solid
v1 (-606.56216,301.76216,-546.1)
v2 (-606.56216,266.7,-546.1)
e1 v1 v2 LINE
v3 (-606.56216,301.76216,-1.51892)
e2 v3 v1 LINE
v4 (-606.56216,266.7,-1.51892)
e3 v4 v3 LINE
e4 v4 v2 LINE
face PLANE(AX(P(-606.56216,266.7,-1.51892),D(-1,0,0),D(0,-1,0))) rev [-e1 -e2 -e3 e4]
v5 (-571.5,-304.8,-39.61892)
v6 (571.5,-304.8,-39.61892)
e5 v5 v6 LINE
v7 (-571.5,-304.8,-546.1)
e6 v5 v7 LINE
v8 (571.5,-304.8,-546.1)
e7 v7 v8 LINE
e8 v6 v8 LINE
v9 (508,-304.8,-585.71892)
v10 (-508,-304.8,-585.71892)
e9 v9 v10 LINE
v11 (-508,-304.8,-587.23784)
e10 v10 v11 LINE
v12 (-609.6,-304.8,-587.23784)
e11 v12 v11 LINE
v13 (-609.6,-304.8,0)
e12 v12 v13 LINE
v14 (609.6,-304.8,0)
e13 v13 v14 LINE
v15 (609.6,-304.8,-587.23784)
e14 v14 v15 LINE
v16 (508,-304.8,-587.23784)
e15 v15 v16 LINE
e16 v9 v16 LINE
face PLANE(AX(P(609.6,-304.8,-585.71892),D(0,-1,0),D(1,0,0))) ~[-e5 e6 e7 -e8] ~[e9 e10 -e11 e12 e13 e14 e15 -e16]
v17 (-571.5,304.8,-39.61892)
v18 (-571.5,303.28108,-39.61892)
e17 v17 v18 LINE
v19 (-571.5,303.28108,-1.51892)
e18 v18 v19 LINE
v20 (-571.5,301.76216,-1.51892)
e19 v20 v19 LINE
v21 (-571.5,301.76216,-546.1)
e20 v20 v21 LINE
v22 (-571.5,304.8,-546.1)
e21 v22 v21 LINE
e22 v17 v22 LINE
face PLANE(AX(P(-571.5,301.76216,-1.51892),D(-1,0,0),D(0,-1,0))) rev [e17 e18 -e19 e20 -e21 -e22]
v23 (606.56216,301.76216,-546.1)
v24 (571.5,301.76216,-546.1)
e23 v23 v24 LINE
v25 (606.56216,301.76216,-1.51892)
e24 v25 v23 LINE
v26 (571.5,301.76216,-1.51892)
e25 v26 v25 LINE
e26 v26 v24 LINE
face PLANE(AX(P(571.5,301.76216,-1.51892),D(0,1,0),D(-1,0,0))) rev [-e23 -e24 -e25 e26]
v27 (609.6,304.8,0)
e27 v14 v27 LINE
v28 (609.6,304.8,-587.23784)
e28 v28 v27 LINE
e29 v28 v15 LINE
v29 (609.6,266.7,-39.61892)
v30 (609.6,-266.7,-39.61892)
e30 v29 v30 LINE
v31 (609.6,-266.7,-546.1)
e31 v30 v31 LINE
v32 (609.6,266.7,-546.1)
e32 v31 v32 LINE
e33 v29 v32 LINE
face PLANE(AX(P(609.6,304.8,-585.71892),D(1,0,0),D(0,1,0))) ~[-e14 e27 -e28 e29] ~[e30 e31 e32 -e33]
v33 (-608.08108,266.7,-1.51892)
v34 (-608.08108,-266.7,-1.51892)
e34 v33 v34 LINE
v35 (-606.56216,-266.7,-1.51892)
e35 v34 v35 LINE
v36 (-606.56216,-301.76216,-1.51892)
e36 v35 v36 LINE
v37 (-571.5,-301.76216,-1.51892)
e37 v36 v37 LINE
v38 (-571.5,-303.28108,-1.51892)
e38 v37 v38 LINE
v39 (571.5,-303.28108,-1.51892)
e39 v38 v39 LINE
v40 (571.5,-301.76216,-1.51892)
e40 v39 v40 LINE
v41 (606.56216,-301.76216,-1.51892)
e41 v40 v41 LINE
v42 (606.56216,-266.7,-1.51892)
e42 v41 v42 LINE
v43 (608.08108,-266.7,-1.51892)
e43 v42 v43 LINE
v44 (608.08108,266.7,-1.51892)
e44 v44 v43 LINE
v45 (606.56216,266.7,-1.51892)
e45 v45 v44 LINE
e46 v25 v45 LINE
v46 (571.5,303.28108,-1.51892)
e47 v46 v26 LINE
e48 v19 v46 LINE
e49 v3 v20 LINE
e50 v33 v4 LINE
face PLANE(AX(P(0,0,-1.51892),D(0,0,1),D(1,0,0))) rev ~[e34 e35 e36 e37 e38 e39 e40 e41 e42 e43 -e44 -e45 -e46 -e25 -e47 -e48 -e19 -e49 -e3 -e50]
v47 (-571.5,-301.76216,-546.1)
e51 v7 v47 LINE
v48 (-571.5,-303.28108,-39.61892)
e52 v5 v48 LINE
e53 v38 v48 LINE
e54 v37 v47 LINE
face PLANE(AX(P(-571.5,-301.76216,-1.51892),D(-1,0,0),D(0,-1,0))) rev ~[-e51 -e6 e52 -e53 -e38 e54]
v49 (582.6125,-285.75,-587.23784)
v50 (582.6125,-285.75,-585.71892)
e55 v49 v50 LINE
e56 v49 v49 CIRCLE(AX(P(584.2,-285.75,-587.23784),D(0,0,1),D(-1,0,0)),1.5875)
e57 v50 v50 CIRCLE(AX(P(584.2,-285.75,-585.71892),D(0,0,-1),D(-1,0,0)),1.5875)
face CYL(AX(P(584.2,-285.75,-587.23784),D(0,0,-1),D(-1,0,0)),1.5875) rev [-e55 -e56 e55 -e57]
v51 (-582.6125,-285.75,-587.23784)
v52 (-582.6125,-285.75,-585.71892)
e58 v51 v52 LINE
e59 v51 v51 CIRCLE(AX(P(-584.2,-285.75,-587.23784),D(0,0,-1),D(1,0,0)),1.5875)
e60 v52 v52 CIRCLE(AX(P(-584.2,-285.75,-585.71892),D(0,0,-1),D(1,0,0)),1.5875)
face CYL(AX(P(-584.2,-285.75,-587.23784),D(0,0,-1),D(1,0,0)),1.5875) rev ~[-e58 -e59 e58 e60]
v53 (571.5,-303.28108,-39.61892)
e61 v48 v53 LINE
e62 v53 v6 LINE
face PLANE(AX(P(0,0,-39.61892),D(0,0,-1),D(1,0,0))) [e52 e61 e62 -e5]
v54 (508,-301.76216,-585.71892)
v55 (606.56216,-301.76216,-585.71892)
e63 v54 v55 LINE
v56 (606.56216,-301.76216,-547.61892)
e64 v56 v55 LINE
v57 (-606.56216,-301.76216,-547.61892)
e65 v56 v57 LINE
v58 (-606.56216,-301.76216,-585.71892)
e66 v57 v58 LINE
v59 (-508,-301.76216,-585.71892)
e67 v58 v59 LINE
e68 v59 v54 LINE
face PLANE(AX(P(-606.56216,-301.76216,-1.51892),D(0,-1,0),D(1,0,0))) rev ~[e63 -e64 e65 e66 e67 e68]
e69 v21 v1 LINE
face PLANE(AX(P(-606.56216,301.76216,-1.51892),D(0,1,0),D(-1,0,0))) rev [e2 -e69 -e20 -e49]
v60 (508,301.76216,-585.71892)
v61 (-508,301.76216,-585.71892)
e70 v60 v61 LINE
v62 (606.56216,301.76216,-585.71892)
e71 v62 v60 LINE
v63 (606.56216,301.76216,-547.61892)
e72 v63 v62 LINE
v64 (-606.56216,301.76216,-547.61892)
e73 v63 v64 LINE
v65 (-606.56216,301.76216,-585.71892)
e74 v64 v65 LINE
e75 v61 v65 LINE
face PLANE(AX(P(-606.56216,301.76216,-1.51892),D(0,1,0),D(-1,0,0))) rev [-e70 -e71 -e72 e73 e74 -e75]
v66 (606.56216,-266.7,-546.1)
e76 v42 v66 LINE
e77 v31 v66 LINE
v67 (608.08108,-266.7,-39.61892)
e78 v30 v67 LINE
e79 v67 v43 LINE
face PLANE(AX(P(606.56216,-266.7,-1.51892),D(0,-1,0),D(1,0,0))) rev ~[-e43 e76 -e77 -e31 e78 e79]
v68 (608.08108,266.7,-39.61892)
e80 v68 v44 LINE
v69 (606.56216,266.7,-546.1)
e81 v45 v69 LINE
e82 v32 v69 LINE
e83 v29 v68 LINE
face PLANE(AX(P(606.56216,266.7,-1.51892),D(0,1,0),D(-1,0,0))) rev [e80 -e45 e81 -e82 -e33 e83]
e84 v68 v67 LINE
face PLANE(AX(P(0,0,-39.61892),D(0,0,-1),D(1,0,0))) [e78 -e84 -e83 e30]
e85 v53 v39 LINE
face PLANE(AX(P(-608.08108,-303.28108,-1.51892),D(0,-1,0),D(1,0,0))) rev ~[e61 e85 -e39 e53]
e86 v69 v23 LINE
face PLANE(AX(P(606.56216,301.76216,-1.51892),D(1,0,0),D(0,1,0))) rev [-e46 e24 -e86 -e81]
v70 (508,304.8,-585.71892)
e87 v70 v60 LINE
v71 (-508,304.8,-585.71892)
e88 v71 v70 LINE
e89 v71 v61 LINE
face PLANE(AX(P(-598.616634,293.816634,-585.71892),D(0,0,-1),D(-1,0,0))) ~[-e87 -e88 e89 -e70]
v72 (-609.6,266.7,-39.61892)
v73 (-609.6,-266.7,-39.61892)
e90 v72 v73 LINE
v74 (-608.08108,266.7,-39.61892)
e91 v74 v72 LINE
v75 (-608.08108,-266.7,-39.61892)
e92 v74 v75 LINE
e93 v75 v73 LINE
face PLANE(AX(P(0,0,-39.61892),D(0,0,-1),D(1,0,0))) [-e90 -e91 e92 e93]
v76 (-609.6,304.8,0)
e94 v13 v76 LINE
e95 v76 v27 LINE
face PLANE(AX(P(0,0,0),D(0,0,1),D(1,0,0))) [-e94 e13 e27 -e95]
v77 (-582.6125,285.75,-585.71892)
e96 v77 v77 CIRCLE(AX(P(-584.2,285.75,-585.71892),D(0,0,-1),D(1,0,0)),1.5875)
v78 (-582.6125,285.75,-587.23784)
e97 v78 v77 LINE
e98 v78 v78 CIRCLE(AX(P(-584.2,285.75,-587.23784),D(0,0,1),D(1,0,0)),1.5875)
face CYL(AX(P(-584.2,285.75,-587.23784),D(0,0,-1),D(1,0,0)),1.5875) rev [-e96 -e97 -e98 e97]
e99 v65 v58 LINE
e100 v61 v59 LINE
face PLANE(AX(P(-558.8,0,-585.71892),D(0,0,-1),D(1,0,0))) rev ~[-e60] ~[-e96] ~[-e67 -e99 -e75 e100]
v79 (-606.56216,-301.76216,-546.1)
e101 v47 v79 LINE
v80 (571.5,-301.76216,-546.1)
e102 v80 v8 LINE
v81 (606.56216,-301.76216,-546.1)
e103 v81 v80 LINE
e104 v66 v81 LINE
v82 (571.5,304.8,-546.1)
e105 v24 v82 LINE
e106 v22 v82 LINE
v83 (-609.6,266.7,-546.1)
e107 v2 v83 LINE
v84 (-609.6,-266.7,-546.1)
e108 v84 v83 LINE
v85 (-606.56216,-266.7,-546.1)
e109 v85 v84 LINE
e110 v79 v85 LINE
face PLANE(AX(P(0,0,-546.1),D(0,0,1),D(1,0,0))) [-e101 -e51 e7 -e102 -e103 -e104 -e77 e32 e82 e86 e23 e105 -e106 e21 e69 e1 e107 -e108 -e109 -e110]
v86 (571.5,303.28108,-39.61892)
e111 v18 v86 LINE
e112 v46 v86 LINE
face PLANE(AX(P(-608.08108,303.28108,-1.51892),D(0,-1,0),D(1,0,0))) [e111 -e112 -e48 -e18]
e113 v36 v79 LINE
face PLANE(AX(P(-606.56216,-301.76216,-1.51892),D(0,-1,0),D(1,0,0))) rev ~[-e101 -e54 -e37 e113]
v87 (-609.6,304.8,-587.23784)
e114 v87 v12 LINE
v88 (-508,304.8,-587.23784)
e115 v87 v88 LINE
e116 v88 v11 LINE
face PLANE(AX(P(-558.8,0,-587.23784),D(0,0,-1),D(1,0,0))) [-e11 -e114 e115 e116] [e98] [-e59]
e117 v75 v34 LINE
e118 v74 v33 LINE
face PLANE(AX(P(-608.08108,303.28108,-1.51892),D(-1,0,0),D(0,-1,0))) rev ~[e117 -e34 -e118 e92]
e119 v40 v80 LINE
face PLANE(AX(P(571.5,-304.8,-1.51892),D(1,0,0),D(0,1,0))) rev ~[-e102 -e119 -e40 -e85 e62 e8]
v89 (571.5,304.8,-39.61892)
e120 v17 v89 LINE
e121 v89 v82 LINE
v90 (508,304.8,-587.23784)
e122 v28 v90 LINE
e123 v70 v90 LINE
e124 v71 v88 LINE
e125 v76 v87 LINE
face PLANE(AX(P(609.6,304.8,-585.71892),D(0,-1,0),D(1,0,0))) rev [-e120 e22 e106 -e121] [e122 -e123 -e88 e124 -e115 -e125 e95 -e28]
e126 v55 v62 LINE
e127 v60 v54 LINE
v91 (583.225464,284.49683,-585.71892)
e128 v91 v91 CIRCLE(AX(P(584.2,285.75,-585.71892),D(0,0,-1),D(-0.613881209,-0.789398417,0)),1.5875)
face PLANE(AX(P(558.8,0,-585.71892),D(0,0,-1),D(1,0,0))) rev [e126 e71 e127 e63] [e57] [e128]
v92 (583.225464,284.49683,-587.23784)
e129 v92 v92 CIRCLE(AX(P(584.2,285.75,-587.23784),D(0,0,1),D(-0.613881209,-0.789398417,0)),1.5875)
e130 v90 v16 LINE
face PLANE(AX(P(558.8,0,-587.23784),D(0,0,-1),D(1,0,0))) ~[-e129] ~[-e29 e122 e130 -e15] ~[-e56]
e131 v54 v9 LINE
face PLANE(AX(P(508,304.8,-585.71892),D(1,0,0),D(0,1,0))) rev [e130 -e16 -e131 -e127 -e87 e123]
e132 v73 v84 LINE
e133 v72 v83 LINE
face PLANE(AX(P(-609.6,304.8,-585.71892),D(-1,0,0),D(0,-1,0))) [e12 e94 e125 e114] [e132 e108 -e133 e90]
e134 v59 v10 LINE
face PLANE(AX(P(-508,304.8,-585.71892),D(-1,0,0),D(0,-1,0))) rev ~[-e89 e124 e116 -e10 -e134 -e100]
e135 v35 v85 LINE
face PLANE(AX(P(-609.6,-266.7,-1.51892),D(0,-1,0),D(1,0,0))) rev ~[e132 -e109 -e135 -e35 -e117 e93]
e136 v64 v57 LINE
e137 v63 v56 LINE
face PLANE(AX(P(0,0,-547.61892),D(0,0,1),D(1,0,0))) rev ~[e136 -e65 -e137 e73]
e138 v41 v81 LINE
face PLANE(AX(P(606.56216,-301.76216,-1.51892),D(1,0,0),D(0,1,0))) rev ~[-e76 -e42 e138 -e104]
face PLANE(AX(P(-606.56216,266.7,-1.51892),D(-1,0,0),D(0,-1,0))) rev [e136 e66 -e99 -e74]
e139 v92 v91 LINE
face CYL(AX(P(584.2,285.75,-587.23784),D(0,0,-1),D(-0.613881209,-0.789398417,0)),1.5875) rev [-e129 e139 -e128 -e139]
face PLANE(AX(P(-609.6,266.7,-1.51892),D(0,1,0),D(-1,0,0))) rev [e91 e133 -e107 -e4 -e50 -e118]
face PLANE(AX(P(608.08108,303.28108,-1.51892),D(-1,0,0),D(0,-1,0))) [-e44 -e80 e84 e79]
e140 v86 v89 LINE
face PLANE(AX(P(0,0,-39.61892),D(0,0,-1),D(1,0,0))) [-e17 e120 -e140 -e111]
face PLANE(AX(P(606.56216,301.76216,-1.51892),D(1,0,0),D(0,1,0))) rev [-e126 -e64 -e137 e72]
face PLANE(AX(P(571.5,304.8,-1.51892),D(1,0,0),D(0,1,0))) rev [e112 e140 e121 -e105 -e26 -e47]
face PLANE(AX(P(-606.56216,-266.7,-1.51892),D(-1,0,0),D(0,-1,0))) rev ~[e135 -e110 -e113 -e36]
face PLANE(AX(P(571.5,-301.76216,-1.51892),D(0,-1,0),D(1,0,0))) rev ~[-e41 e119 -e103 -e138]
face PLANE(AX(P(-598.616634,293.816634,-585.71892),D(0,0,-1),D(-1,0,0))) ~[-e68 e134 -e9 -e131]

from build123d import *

# Parameters (mm, degrees)
F0_W      = 1219.2
F0_H      = 609.6
F1_DEPTH  = 1.51892
F2_W      = 1219.2
F2_H      = 609.6
F2_W_2    = 1216.16216
F2_H_2    = 606.56216
F3_DEPTH  = 38.1
F5_DEPTH  = 584.2
F7_W      = 1219.2
F7_H      = 609.6
F8_DEPTH  = 1.51892
F9_W      = 1219.2
F9_H      = 609.6
F9_W_2    = 1213.12432
F9_H_2    = 603.52432
F10_DEPTH = 38.1
F11_W     = 101.6
F11_H     = 609.6
F12_DEPTH = 1.51892
F13_R     = 1.5875
F14_DEPTH = 1.651


# Not quite as in the source:
# - a pattern or mirror of a feature is missing from the dataset's text; its kind, count and spacing are read off the source's solid


with BuildPart() as f1:
    # F0 (on Top) → F1 (new body)
    with BuildSketch(Plane.XY):
        Rectangle(F0_W, F0_H)
    extrude(amount=-F1_DEPTH)

    # F2 (on face) → F3 (join)
    with BuildSketch(Plane(origin=(0, 0, -1.51892), x_dir=(1, 0, 0), z_dir=(0, 0, -1))):
        Rectangle(F2_W, F2_H)
        Rectangle(F2_W_2, F2_H_2, mode=Mode.SUBTRACT)
    extrude(amount=F3_DEPTH)

    # F4 (on face) → F5 (join)
    with BuildSketch(Plane(origin=(0, 0, -1.51892), x_dir=(1, 0, 0), z_dir=(0, 0, -1))):
        Polygon((-571.5, 301.76216), (-571.5, 304.8), (-609.6, 304.8), (-609.6, 266.7), (-606.56216, 266.7), (-606.56216, 301.76216), align=None)
        Polygon((571.5, 304.8), (571.5, 301.76216), (606.56216, 301.76216), (606.56216, 266.7), (609.6, 266.7), (609.6, 304.8), align=None)
    f5 = extrude(amount=F5_DEPTH)

    # F5_copies: F5 across plane
    add(f5.mirror(Plane.ZX))

    # F7 (on offset) → F8 (join)
    with BuildSketch(Plane.XY.offset(-546.1)):
        Rectangle(F7_W, F7_H)
    extrude(amount=-F8_DEPTH)

    # F9 (on face) → F10 (join)
    with BuildSketch(Plane(origin=(0, 0, -547.61892), x_dir=(1, 0, 0), z_dir=(0, 0, -1))):
        Rectangle(F9_W, F9_H)
        Rectangle(F9_W_2, F9_H_2, mode=Mode.SUBTRACT)
    extrude(amount=F10_DEPTH)

    # F11 (on face) → F12 (join)
    with BuildSketch(Plane(origin=(0, 0, -585.71892), x_dir=(1, 0, 0), z_dir=(0, 0, -1))):
        with Locations((-558.8, 0)):
            Rectangle(F11_W, F11_H)
    f12 = extrude(amount=F12_DEPTH)

    # F12_copies: F12 across plane
    add(f12.mirror(Plane(origin=(0, 0, 0), x_dir=(0, 0, 1), z_dir=(1, 0, 0))))

    # F13 (on face) → F14 (cut)
    with BuildSketch(Plane(origin=(0, 0, -587.23784), x_dir=(1, 0, 0), z_dir=(0, 0, -1))):
        with Locations((-584.2, 285.75)):
            Circle(F13_R)
    f14 = extrude(amount=-F14_DEPTH, mode=Mode.SUBTRACT)

    # F14_copies: F14 across plane
    add(f14.mirror(Plane(origin=(0, 0, 0), x_dir=(0, 0, 1), z_dir=(1, 0, 0))), mode=Mode.SUBTRACT)

    # F14_copies1: F14 across plane
    add(f14.mirror(Plane.ZX), mode=Mode.SUBTRACT)

    # F14_copies2: F14 across plane
    add(f14.mirror(Plane(origin=(0, 0, 0), x_dir=(-0.4393852473, 0.8982987278, 0), z_dir=(0.8982987278, 0.4393852473, 0))), mode=Mode.SUBTRACT)


solid = f1.part
